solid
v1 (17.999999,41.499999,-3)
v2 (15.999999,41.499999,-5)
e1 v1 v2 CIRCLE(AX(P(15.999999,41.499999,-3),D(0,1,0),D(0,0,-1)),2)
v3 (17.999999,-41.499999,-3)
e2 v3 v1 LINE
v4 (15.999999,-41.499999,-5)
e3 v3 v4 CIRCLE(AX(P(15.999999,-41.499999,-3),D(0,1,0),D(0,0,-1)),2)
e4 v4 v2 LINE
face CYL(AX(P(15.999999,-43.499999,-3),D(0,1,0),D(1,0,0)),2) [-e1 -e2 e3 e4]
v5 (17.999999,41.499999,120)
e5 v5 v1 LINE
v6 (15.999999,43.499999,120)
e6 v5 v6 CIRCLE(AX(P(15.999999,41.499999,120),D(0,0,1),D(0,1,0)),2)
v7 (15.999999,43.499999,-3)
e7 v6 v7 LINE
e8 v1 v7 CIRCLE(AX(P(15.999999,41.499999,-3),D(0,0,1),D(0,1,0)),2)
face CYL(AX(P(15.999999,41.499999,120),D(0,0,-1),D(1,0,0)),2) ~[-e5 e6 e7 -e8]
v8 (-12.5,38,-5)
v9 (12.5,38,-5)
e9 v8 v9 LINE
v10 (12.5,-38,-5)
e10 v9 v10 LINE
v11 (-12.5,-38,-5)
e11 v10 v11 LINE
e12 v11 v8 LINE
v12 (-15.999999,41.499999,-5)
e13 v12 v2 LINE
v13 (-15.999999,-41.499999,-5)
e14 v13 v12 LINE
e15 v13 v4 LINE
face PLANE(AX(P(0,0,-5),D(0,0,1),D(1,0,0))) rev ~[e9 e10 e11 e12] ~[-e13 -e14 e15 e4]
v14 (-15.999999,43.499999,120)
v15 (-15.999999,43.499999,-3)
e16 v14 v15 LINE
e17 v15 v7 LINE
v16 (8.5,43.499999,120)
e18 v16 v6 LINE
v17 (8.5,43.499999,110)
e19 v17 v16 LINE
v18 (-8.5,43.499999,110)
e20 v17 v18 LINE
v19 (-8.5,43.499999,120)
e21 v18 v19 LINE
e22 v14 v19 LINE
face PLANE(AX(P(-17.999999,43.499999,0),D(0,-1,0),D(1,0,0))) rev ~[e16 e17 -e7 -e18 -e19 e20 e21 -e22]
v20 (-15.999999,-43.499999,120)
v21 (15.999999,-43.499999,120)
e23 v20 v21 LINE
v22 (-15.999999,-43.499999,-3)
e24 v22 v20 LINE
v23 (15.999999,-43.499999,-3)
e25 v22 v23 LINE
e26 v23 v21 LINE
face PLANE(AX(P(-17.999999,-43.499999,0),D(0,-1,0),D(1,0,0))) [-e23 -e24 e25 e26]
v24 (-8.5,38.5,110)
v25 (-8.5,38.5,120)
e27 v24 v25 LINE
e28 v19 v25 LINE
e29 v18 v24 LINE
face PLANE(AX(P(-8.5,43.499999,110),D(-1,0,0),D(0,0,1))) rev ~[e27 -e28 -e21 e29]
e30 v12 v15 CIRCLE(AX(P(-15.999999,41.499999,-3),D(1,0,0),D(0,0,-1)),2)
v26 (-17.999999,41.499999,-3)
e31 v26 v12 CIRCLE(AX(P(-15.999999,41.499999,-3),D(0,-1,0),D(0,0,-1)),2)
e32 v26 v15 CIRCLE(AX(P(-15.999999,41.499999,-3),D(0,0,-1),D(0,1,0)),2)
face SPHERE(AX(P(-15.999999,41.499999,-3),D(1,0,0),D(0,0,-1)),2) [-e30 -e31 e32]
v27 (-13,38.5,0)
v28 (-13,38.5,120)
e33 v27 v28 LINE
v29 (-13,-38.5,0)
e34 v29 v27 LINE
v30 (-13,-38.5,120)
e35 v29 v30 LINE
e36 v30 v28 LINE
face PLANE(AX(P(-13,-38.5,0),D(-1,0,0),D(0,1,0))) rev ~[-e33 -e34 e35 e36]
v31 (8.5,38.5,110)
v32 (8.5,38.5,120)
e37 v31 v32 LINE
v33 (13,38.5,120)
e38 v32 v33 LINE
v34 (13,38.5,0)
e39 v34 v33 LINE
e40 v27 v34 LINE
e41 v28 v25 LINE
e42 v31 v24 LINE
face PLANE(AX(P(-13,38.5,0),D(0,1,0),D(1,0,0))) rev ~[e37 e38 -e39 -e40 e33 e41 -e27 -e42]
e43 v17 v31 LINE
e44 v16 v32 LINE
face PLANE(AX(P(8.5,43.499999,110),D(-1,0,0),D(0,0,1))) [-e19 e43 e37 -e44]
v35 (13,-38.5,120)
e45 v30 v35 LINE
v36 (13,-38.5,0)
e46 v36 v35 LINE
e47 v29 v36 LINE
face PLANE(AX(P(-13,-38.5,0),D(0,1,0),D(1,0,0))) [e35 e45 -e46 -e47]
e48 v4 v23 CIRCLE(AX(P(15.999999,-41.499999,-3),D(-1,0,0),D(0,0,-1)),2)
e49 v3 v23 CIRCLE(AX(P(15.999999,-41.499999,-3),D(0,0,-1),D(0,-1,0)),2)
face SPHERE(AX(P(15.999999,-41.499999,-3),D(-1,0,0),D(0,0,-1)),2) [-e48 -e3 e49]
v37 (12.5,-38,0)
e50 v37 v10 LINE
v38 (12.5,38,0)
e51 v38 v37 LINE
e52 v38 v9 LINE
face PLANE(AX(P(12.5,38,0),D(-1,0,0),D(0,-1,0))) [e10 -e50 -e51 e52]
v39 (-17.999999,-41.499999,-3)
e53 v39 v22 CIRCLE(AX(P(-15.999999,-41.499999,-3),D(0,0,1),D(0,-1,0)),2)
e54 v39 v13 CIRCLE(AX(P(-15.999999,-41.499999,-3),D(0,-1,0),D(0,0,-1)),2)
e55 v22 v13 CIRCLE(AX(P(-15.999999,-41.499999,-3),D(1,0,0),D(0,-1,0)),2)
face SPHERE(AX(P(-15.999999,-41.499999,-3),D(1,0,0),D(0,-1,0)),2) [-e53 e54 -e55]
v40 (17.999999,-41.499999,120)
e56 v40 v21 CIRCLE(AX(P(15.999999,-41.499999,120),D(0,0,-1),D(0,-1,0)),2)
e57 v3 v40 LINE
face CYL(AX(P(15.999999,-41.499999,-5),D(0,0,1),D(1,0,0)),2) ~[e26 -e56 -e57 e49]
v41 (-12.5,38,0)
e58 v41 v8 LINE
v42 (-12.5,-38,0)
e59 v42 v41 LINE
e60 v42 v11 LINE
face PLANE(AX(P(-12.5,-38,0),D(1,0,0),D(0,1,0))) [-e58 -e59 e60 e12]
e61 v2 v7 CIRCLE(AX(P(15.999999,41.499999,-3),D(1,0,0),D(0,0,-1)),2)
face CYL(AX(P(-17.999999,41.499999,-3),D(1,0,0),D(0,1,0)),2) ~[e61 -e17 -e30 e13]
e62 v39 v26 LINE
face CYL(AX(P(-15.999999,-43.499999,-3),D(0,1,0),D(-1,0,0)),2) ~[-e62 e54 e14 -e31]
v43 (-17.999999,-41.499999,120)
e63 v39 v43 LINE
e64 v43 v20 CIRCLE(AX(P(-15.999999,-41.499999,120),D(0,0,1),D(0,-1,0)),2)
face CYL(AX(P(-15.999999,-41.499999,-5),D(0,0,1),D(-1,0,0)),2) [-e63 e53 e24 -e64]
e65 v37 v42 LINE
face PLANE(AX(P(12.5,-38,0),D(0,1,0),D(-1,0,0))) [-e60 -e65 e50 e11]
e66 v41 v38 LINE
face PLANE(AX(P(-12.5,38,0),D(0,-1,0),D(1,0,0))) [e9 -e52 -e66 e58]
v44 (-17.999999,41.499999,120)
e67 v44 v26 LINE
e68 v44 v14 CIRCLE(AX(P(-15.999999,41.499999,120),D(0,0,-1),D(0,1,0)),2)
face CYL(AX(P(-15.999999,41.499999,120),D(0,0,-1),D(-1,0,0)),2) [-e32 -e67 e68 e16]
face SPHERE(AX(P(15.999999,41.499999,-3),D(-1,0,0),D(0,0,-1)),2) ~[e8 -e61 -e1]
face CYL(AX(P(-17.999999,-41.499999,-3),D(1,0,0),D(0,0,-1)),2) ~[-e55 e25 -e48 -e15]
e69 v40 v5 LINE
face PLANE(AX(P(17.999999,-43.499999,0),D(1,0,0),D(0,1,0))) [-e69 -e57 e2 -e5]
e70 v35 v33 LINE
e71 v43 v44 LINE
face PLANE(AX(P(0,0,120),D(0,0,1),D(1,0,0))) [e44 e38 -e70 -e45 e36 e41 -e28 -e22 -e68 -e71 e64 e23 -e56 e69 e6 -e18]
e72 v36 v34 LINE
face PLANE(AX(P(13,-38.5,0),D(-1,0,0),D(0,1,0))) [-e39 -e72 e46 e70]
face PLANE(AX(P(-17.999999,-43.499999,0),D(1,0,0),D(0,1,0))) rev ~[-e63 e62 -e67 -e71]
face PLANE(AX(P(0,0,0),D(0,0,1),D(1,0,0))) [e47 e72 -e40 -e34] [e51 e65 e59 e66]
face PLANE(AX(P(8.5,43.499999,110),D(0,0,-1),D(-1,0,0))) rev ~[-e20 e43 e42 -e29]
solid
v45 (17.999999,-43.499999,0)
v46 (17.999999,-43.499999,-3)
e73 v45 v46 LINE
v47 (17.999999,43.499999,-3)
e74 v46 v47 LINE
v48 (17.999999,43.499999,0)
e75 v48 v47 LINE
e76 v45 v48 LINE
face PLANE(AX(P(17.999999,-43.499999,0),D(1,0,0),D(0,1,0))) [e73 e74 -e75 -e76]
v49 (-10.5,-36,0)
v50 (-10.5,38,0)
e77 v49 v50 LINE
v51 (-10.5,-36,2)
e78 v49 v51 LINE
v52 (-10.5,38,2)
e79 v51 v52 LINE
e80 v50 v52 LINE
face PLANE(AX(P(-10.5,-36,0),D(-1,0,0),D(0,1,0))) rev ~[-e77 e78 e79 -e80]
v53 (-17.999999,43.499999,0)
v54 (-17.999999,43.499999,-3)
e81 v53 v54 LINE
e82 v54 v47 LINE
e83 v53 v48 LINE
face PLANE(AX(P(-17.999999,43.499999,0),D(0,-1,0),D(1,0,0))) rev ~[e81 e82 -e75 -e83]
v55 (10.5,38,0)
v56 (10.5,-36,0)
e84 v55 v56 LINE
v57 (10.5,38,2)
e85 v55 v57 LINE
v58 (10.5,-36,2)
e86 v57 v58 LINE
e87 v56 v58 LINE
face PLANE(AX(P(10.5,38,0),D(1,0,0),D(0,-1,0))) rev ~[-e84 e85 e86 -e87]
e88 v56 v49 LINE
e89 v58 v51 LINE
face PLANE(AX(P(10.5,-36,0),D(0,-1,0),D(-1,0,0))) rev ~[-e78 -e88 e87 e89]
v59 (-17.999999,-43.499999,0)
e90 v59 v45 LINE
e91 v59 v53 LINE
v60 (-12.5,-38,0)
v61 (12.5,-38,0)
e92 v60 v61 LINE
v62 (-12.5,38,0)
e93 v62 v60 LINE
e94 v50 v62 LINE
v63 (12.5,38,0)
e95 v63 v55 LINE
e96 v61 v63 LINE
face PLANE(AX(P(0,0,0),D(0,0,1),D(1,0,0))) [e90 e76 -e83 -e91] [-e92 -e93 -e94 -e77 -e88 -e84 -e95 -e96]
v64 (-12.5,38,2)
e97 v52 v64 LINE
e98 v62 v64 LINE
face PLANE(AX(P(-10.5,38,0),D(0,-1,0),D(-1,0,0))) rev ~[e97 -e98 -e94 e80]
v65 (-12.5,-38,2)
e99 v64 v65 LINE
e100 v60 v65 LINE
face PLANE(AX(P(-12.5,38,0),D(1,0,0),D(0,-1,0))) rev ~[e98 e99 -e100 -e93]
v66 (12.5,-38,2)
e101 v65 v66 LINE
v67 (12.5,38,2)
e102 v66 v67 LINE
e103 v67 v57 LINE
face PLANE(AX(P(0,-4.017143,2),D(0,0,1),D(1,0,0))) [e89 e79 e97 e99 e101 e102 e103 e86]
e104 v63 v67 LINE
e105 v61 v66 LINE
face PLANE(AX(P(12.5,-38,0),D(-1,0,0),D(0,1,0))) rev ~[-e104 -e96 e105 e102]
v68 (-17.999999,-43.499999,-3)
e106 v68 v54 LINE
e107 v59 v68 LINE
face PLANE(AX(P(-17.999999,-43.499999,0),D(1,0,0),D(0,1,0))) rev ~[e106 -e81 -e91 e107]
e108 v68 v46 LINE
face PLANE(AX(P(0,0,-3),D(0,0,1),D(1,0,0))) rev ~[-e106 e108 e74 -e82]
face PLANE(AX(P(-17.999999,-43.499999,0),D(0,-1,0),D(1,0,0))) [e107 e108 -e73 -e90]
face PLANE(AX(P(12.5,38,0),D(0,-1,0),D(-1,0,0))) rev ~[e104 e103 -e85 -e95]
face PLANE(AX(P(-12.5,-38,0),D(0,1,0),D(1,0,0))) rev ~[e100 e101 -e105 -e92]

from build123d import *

# Parameters (mm, degrees)
F0_W     = 35.9999979138
F0_H     = 86.9999979138
F0_W_2   = 26
F0_H_2   = 77
F1_DEPTH = 120
F2_DEPTH = 5
F3_R     = 2
F5_W     = 17
F5_H     = 10
F6_DEPTH = 25
F7_DEPTH = 2
F0_W_3   = 21
F0_H_3   = 74
F8_DEPTH = 3


with BuildPart() as f1:
    # F0 (on Top) → F1 (new body)
    with BuildSketch(Plane.XY):
        Rectangle(F0_W, F0_H)
        Rectangle(F0_W_2, F0_H_2, mode=Mode.SUBTRACT)
    extrude(amount=F1_DEPTH)

    # F0 (on Top) → F2 (join)
    with BuildSketch(Plane.XY):
        Rectangle(F0_W, F0_H)
        Rectangle(F0_W_2, F0_H_2, mode=Mode.SUBTRACT)
        Rectangle(F0_W_2, F0_H_2)
        Polygon((12.5, 38), (12.5, -38), (-12.5, -38), (-12.5, 38), (-10.5, 38), (10.5, 38), align=None, mode=Mode.SUBTRACT)
    extrude(amount=-F2_DEPTH)

    # F3
    f3_edges = [f1.edges().sort_by_distance(p)[0] for p in [
        (0, 43.499999, -5),
        (0, -43.499999, -5),
        (-17.999999, -43.499999, 57.5),
        (17.999999, 0, -5),
        (17.999999, -43.499999, 57.5),
        (17.999999, 43.499999, 57.5),
        (-17.999999, 0, -5),
        (-17.999999, 43.499999, 57.5),
    ]]
    fillet(f3_edges, radius=F3_R)

    # F5 (on face) → F6 (cut)
    with BuildSketch(Plane(origin=(0, 43.4999989569, 0), x_dir=(-1, 0, 0), z_dir=(0, 1, 0))):
        with Locations((0, 115)):
            Rectangle(F5_W, F5_H)
    extrude(amount=-F6_DEPTH, mode=Mode.SUBTRACT)


with BuildPart() as f7:
    # F0 (on Top) → F7 (new body)
    with BuildSketch(Plane.XY):
        Polygon((-12.5, -38), (12.5, -38), (12.5, 38), (10.5, 38), (10.5, -36), (-10.5, -36), (-10.5, 38), (-12.5, 38), align=None)
    extrude(amount=F7_DEPTH)

    # F0 (on Top) → F8 (join)
    with BuildSketch(Plane.XY):
        Rectangle(F0_W, F0_H)
        Rectangle(F0_W_2, F0_H_2, mode=Mode.SUBTRACT)
        Rectangle(F0_W_2, F0_H_2)
        Polygon((12.5, 38), (12.5, -38), (-12.5, -38), (-12.5, 38), (-10.5, 38), (10.5, 38), align=None, mode=Mode.SUBTRACT)
        with Locations((0, 1)):
            Rectangle(F0_W_3, F0_H_3)
        Polygon((-12.5, -38), (12.5, -38), (12.5, 38), (10.5, 38), (10.5, -36), (-10.5, -36), (-10.5, 38), (-12.5, 38), align=None)
    extrude(amount=-F8_DEPTH)


solid = Compound([f1.part, f7.part])
